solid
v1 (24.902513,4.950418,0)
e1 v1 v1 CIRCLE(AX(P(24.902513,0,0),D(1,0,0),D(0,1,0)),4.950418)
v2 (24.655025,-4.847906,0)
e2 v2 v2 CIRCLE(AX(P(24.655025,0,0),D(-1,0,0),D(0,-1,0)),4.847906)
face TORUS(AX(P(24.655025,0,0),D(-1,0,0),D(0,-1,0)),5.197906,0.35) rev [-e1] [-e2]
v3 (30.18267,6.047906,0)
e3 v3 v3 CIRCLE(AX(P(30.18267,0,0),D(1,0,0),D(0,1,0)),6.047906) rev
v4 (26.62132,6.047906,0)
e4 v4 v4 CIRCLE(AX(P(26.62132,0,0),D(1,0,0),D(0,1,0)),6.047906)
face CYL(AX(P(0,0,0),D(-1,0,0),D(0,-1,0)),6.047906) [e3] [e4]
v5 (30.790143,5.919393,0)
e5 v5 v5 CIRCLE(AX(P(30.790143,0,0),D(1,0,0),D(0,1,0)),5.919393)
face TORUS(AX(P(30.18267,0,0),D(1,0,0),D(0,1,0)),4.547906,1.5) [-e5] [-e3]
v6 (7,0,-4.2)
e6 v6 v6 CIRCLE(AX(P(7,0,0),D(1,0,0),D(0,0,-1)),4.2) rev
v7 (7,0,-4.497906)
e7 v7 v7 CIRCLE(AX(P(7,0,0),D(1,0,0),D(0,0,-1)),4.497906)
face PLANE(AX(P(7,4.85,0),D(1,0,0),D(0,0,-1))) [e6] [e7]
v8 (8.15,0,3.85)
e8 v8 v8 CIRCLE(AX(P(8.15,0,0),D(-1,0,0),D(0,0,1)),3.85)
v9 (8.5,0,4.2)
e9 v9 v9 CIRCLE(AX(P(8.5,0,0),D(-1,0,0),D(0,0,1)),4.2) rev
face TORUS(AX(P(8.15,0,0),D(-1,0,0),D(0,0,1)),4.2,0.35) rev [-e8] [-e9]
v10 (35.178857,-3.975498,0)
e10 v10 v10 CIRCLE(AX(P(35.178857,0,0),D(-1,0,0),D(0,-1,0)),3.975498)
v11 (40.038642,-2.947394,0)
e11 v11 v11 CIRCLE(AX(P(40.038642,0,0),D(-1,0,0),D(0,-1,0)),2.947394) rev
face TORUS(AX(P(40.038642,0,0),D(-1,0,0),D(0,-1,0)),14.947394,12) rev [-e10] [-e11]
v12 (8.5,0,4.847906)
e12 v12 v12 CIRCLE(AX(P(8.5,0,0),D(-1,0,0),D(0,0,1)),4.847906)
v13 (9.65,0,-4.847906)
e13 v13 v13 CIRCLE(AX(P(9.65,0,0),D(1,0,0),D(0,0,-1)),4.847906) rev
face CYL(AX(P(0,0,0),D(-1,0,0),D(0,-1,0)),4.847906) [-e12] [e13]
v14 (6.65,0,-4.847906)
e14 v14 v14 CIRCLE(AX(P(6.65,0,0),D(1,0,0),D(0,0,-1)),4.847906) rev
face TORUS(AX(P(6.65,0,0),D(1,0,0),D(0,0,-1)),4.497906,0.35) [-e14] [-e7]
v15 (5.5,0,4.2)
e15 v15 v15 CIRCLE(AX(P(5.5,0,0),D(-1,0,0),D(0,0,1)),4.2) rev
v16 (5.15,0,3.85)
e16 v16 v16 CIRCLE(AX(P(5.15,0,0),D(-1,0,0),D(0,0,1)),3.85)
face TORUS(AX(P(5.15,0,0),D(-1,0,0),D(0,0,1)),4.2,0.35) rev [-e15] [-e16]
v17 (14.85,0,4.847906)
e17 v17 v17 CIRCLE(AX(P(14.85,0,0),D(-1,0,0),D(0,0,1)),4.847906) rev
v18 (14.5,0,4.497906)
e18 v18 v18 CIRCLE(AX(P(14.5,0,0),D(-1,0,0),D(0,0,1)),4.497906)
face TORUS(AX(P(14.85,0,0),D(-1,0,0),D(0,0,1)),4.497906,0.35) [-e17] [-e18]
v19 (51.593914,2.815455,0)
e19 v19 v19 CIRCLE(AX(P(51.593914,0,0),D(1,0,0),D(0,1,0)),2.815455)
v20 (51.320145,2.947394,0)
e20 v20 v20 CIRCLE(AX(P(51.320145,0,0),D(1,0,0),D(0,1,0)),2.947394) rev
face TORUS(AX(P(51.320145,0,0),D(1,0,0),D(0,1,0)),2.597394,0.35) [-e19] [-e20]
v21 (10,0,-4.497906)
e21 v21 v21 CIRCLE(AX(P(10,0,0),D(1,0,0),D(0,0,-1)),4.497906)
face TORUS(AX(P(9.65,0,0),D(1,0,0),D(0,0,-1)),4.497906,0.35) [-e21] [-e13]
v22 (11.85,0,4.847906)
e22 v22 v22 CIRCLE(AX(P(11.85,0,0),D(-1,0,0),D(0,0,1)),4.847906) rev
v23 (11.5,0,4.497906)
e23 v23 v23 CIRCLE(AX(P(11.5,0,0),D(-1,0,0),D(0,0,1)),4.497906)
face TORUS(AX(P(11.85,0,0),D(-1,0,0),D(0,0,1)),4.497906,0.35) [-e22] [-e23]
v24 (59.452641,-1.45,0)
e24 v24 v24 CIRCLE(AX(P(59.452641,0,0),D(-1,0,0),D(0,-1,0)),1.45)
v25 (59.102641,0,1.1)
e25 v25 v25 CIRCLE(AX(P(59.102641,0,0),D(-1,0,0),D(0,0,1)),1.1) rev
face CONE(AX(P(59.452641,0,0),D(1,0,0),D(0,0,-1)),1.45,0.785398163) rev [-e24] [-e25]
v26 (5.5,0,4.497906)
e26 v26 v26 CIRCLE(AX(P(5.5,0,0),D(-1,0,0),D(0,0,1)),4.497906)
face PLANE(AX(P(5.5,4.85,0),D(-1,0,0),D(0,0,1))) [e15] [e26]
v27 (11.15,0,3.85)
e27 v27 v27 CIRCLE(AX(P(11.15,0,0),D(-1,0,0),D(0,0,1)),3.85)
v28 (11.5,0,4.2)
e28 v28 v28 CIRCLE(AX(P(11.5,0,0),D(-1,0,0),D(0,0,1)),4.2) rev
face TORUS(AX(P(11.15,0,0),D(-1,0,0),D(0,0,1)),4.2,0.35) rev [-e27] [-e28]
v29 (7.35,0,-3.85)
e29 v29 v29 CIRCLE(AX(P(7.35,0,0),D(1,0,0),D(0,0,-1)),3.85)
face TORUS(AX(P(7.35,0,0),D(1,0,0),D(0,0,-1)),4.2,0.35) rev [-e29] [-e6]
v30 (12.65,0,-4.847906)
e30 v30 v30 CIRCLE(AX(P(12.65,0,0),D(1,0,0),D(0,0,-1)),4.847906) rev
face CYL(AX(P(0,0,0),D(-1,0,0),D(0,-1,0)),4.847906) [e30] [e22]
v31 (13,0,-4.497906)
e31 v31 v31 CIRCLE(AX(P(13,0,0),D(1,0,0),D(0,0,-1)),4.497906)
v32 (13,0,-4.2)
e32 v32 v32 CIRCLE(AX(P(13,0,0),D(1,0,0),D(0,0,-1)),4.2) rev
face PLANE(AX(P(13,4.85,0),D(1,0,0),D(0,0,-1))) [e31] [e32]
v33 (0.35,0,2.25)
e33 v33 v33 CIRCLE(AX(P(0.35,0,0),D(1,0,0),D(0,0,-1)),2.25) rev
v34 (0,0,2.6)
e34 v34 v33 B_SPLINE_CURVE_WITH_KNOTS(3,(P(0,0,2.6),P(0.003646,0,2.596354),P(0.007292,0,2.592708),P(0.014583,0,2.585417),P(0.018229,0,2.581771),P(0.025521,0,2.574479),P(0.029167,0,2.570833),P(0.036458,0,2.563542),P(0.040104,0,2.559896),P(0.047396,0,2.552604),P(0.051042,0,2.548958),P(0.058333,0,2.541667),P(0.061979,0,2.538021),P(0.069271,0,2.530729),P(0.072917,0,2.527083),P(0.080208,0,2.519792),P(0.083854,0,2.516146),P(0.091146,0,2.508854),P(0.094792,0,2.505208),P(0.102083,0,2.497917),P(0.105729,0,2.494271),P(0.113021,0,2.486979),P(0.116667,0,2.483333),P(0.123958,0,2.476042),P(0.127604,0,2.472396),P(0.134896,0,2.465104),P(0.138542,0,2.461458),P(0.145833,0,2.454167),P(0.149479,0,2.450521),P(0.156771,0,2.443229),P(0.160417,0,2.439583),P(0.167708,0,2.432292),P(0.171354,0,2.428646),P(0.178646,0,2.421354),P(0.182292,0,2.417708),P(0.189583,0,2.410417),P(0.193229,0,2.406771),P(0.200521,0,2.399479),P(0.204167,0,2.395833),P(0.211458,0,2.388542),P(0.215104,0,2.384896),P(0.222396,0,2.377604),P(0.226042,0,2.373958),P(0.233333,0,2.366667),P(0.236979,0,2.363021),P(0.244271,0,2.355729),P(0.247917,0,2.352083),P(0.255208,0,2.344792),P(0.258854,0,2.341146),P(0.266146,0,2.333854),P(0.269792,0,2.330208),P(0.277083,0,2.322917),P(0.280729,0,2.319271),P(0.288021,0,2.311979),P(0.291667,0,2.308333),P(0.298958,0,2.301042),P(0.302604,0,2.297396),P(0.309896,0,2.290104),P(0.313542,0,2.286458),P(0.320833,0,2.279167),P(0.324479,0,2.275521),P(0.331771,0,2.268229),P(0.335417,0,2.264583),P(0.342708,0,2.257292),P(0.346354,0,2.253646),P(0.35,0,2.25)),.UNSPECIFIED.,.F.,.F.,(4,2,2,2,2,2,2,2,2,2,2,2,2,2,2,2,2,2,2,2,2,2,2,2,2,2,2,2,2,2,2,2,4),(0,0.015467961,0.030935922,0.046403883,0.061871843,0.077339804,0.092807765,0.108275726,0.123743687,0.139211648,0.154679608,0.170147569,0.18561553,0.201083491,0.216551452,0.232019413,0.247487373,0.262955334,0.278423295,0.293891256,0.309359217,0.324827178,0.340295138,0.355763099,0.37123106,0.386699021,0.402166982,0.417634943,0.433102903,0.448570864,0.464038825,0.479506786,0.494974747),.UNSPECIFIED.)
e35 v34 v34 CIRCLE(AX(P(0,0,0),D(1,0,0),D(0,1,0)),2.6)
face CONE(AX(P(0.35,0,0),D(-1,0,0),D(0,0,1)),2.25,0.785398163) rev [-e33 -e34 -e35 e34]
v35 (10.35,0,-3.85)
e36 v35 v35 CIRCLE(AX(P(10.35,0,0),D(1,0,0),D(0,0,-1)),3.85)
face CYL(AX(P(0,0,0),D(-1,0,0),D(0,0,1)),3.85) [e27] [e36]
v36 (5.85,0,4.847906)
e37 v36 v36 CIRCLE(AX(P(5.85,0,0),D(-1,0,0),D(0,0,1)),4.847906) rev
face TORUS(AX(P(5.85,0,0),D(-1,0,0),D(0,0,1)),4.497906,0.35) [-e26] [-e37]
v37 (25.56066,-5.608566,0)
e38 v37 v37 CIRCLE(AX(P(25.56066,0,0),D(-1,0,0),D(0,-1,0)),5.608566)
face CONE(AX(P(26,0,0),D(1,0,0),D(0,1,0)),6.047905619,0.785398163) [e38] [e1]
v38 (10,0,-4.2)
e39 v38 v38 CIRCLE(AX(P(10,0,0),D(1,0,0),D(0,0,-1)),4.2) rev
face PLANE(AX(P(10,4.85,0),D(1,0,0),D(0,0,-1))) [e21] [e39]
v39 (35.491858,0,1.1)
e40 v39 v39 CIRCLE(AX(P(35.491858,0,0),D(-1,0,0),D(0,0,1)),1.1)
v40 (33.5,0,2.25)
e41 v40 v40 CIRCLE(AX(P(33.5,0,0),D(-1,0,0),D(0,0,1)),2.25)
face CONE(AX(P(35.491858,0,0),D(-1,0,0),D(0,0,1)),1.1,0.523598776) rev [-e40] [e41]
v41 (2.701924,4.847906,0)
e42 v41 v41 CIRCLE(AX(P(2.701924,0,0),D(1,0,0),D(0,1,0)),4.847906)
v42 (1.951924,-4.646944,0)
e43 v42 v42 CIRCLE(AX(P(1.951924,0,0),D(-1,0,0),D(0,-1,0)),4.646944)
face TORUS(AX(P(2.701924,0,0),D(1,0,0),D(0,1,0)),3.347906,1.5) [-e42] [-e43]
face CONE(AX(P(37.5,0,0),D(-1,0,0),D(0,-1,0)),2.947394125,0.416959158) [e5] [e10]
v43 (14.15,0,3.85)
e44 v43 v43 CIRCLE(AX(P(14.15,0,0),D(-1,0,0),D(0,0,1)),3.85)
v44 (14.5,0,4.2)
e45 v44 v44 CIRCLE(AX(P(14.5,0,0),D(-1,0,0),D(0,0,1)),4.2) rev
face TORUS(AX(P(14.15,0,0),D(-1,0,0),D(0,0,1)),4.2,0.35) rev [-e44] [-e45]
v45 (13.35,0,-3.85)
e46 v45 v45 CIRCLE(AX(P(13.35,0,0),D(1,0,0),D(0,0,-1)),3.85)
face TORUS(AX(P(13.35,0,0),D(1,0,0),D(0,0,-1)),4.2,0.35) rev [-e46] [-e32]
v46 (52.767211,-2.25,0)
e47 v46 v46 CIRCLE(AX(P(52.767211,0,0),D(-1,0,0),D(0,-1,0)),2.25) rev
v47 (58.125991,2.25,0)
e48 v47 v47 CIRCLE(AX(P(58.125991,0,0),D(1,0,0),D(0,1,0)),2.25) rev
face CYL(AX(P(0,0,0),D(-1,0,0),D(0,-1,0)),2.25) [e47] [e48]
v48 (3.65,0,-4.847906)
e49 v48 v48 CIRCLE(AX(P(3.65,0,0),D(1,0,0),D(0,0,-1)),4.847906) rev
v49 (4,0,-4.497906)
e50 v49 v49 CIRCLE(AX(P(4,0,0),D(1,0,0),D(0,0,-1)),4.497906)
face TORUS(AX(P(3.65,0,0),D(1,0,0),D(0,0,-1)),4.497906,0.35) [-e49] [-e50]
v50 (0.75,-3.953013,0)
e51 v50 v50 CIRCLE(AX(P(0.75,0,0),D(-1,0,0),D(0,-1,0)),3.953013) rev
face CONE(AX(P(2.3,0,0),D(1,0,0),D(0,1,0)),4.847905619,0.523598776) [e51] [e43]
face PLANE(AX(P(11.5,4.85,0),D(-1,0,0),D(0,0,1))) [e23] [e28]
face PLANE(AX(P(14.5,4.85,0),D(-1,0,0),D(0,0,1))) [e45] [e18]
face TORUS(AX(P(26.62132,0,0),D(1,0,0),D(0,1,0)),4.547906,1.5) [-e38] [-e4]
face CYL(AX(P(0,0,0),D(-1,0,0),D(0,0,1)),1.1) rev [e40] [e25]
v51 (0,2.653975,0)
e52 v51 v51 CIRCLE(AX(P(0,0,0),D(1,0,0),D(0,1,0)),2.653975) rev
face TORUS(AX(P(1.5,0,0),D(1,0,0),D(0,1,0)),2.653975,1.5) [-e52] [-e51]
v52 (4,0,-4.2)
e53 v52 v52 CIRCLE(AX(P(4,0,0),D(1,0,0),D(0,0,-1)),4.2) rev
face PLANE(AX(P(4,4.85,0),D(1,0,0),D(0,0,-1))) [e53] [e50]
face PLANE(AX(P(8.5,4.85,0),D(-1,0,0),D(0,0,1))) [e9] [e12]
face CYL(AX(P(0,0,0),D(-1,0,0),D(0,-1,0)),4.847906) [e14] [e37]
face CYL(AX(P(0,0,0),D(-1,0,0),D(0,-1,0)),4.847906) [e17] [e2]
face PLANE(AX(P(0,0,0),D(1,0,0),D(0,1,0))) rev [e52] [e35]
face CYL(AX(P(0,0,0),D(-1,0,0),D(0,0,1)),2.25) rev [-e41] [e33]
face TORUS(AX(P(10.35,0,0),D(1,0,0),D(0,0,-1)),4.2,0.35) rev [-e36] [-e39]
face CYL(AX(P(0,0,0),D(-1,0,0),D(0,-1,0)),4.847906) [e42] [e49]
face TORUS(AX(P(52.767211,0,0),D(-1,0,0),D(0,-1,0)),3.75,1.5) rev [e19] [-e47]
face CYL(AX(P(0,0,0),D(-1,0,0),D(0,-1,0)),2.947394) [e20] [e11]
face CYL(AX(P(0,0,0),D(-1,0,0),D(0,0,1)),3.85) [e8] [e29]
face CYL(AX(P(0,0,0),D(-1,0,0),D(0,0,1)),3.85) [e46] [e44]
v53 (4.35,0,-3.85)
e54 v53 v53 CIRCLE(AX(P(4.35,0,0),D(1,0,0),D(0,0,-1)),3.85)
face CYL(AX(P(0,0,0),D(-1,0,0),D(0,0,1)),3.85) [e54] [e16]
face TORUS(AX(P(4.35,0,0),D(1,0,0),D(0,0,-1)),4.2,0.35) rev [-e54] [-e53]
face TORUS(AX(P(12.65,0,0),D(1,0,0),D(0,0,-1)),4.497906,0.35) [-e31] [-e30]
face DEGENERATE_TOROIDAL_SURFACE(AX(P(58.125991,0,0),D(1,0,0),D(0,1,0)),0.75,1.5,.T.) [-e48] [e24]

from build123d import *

# Parameters (mm, degrees)
SKETCH2_W     = 1.5000000000000018
SKETCH2_H     = 1.0000000000000004
SKETCH2_W_2   = 1.5
FILLET1_R     = 12
CHAMFER1_SIZE = 0.35
FILLET2_R     = 1.5
FILLET3_R     = 0.35


with BuildPart() as part:
    # Sketch1 → Revolve1 (revolve)
    with BuildSketch(Plane.XY, mode=Mode.PRIVATE) as revolve1_sk:
        Polygon((0, 0), (0, 3.52), (2.2999999999999994, 4.847905619136144), (24.8, 4.847905619136145), (26, 6.047905619136151), (30.5, 6.047905619136152), (37.5, 2.947394125108839), (51.5, 2.947394125108837), (51.90264068586285, 2.25), (59.452640685862846, 2.25), (59.452640685862846, -7e-17), align=None)
    revolve(revolve1_sk.sketch.rotate(Axis((0, 0, 0), (1, 0, 0)), 180), axis=Axis((0, 0, 0), (1, 0, 0)))

    # Sketch2 → Cut-Revolve1 (revolve, cut)
    with BuildSketch(Plane.XY, mode=Mode.PRIVATE) as cut_revolve1_sk:
        Polygon((0, 2.25), (33.5, 2.25), (35.491858428704205, 1.1), (59.452640685862846, 1.1), (59.452640685862846, 0), (0, 0), align=None)
        Polygon((6.999999999999998, 3.849999999999999), (8.5, 3.849999999999999), (8.5, 4.85), (6.999999999999999, 4.85), align=None)
        Polygon((3.999999999999999, 4.85), (5.5, 4.85), (5.5, 3.849999999999999), (3.9999999999999982, 3.849999999999999), align=None)
        with Locations((10.75, 4.35)):
            Rectangle(SKETCH2_W, SKETCH2_H)
        with Locations((13.750000000000002, 4.35)):
            Rectangle(SKETCH2_W_2, SKETCH2_H)
    revolve(cut_revolve1_sk.sketch.rotate(Axis((0, 0, 0), (1, 0, 0)), 90), axis=Axis((0, 0, 0), (1, 0, 0)), mode=Mode.SUBTRACT)

    # Fillet1
    fillet1_edges = [part.edges().sort_by_distance(p)[0] for p in [
        (37.5, 2.947394125108839, -7.2e-16),
    ]]
    fillet(fillet1_edges, radius=FILLET1_R)

    # Chamfer1
    chamfer1_edges = [part.edges().sort_by_distance(p)[0] for p in [
        (0, -5.3e-16, -2.25),
        (59.452640685862846, -2.6e-16, -1.1),
    ]]
    chamfer(chamfer1_edges, length=CHAMFER1_SIZE)

    # Fillet2
    # the kernel refuses this fillet: 1.5 mm, written as the material it adds along each edge
    with BuildSketch(Plane(origin=(51.90264068586285, -6e-17, 0), x_dir=(0, -1, 1.2e-16), z_dir=(0, 1.2e-16, 1))) as fillet2_piece_1:
        with BuildLine():
            CenterArc((3.75, 0.8645703500700748), FILLET2_R, 180, 57.65130167775095)
            Line((2.947394125108838, -0.40264068586284907), (2.931342007611015, -0.4279849065815071))
            ThreePointArc((2.931342007611015, -0.4279849065815071), (2.583697062554419, -0.22730110504495826), (2.235, -0.02598076211353373))
            Line((2.235, -0.02598076211353373), (2.22, 0))
            Line((2.22, 0), (2.22, 0.8645703500700748))
            Line((2.22, 0.8645703500700748), (2.25, 0.8645703500700748))
        make_face()
    revolve(axis=Axis((51.90264068586285, -6e-17, 0), (1, 0, 0)))
    # the kernel refuses this fillet: 1.5 mm, written as the material it takes off along each edge
    with BuildSketch(Plane(origin=(30.5, -4e-17, 0), x_dir=(0, -1, 1.2e-16), z_dir=(0, 1.2e-16, 1))) as fillet2_2_piece_1:
        with BuildLine():
            CenterArc((6.047905619136152 - FILLET2_R, -FILLET2_R * 0.211553464978), FILLET2_R, 0, 23.889999999999986)
            Line((6.047905619136152, -FILLET2_R * 0.211553464978), (6.047905619136152 + FILLET2_R * 0.02, -FILLET2_R * 0.211553464978))
            Line((6.047905619136152 + FILLET2_R * 0.02, -FILLET2_R * 0.211553464978), (6.047905619136152 + FILLET2_R * 0.02, FILLET2_R * 0.00423106929956))
            Line((6.047905619136152 + FILLET2_R * 0.02, FILLET2_R * 0.00423106929956), (6.047905619136152 - FILLET2_R * 0.0673888551076, FILLET2_R * 0.201528188479))
            Line((6.047905619136152 - FILLET2_R * 0.0673888551076, FILLET2_R * 0.201528188479), (6.047905619136152 - FILLET2_R * 0.0856753481447, FILLET2_R * 0.193428548215))
        make_face()
    revolve(axis=Axis((30.5, -4e-17, 0), (1, 0, 0)), mode=Mode.SUBTRACT)
    with BuildSketch(Plane(origin=(26, -3e-17, 0), x_dir=(0, -1, 1.2e-16), z_dir=(0, 1.2e-16, 1))) as fillet2_2_piece_2:
        with BuildLine():
            CenterArc((6.047905619136151 - FILLET2_R, FILLET2_R * 0.414213562373), FILLET2_R, 314.9999999999997, 45.000000000000284)
            Line((6.047905619136151 - FILLET2_R * 0.292893218813, -FILLET2_R * 0.292893218813), (6.047905619136151 - FILLET2_R * 0.27875108319, -FILLET2_R * 0.307035354437))
            Line((6.047905619136151 - FILLET2_R * 0.27875108319, -FILLET2_R * 0.307035354437), (6.047905619136151 + FILLET2_R * 0.02, -FILLET2_R * 0.00828427124746))
            Line((6.047905619136151 + FILLET2_R * 0.02, -FILLET2_R * 0.00828427124746), (6.047905619136151 + FILLET2_R * 0.02, FILLET2_R * 0.414213562373))
            Line((6.047905619136151 + FILLET2_R * 0.02, FILLET2_R * 0.414213562373), (6.047905619136151, FILLET2_R * 0.414213562373))
        make_face()
    revolve(axis=Axis((26, -3e-17, 0), (1, 0, 0)), mode=Mode.SUBTRACT)
    with BuildSketch(Plane(origin=(2.2999999999999994, 0, 0), x_dir=(0, -1, 1.2e-16), z_dir=(0, 1.2e-16, 1))) as fillet2_2_piece_3:
        with BuildLine():
            CenterArc((4.847905619136144 - FILLET2_R, FILLET2_R * 0.267949192431), FILLET2_R, 329.9999999999999, 30.0000000000001)
            Line((4.847905619136144, FILLET2_R * 0.267949192431), (4.847905619136144 + FILLET2_R * 0.02, FILLET2_R * 0.267949192431))
            Line((4.847905619136144 + FILLET2_R * 0.02, FILLET2_R * 0.267949192431), (4.847905619136144 + FILLET2_R * 0.02, -FILLET2_R * 0.00535898384862))
            Line((4.847905619136144 + FILLET2_R * 0.02, -FILLET2_R * 0.00535898384862), (4.847905619136144 - FILLET2_R * 0.11665408814, -FILLET2_R * 0.242050807569))
            Line((4.847905619136144 - FILLET2_R * 0.11665408814, -FILLET2_R * 0.242050807569), (4.847905619136144 - FILLET2_R * 0.133974596216, -FILLET2_R * 0.232050807569))
        make_face()
    revolve(axis=Axis((2.2999999999999994, 0, 0), (1, 0, 0)), mode=Mode.SUBTRACT)
    with BuildSketch(Plane(origin=(0, 0, 0), x_dir=(0, -1, 1.2e-16), z_dir=(0, 1.2e-16, 1))) as fillet2_2_piece_4:
        with BuildLine():
            CenterArc((3.52 - FILLET2_R * 0.57735026919, FILLET2_R), FILLET2_R, 270, 59.9999999999999)
            Line((3.52 + FILLET2_R * 0.288675134595, FILLET2_R * 0.5), (3.52 + FILLET2_R * 0.305995642671, FILLET2_R * 0.49))
            Line((3.52 + FILLET2_R * 0.305995642671, FILLET2_R * 0.49), (3.52 + FILLET2_R * 0.0115470053838, -FILLET2_R * 0.02))
            Line((3.52 + FILLET2_R * 0.0115470053838, -FILLET2_R * 0.02), (3.52 - FILLET2_R * 0.57735026919, -FILLET2_R * 0.02))
            Line((3.52 - FILLET2_R * 0.57735026919, -FILLET2_R * 0.02), (3.52 - FILLET2_R * 0.57735026919, 1e-17))
        make_face()
    revolve(axis=Axis((0, 0, 0), (1, 0, 0)), mode=Mode.SUBTRACT)
    with BuildSketch(Plane(origin=(59.452640685862846, -7e-17, 0), x_dir=(0, -1, 1.2e-16), z_dir=(0, 1.2e-16, 1))) as fillet2_2_piece_5:
        with BuildLine():
            CenterArc((0.7499999999999999, -1.3266499161421734), FILLET2_R, 0, 62.18186071534626)
            Line((2.25, -1.3266499161421734), (2.28, -1.3266499161421734))
            Line((2.28, -1.3266499161421734), (2.28, 0))
            Line((2.28, 0), (2.25, 0.03000000000000114))
            ThreePointArc((2.25, 0.03000000000000114), (1.8499999999999974, 0.03000000000000114), (1.4639999999999944, 0.0265329983228284))
            Line((1.4639999999999944, 0.0265329983228284), (1.4499999999999946, -1.421e-14))
        make_face()
    revolve(axis=Axis((59.452640685862846, -7e-17, 0), (1, 0, 0)), mode=Mode.SUBTRACT)

    # Fillet3
    fillet3_edges = [part.edges().sort_by_distance(p)[0] for p in [
        (51.5, 2.947394125108837, -7.2e-16),
        (24.8, 4.847905619136145, -1.19e-15),
        (14.5, -9e-16, -3.849999999999999),
        (14.5, 4.847905619136144, -1.19e-15),
        (13, -9e-16, -3.849999999999999),
        (13.000000000000002, 4.847905619136144, -1.19e-15),
        (11.5, -9e-16, -3.849999999999999),
        (11.5, 4.847905619136144, -1.19e-15),
        (9.999999999999998, -9e-16, -3.849999999999999),
        (9.999999999999998, 4.847905619136144, -1.19e-15),
        (8.5, -9e-16, -3.849999999999999),
        (6.999999999999998, -9e-16, -3.849999999999999),
        (6.999999999999998, 4.847905619136144, -1.19e-15),
        (5.5, -9e-16, -3.849999999999999),
        (3.9999999999999982, 4.847905619136144, -1.19e-15),
        (3.9999999999999982, -9e-16, -3.849999999999999),
        (5.5, 4.847905619136144, -1.19e-15),
    ]]
    fillet(fillet3_edges, radius=FILLET3_R)


solid = part.part
